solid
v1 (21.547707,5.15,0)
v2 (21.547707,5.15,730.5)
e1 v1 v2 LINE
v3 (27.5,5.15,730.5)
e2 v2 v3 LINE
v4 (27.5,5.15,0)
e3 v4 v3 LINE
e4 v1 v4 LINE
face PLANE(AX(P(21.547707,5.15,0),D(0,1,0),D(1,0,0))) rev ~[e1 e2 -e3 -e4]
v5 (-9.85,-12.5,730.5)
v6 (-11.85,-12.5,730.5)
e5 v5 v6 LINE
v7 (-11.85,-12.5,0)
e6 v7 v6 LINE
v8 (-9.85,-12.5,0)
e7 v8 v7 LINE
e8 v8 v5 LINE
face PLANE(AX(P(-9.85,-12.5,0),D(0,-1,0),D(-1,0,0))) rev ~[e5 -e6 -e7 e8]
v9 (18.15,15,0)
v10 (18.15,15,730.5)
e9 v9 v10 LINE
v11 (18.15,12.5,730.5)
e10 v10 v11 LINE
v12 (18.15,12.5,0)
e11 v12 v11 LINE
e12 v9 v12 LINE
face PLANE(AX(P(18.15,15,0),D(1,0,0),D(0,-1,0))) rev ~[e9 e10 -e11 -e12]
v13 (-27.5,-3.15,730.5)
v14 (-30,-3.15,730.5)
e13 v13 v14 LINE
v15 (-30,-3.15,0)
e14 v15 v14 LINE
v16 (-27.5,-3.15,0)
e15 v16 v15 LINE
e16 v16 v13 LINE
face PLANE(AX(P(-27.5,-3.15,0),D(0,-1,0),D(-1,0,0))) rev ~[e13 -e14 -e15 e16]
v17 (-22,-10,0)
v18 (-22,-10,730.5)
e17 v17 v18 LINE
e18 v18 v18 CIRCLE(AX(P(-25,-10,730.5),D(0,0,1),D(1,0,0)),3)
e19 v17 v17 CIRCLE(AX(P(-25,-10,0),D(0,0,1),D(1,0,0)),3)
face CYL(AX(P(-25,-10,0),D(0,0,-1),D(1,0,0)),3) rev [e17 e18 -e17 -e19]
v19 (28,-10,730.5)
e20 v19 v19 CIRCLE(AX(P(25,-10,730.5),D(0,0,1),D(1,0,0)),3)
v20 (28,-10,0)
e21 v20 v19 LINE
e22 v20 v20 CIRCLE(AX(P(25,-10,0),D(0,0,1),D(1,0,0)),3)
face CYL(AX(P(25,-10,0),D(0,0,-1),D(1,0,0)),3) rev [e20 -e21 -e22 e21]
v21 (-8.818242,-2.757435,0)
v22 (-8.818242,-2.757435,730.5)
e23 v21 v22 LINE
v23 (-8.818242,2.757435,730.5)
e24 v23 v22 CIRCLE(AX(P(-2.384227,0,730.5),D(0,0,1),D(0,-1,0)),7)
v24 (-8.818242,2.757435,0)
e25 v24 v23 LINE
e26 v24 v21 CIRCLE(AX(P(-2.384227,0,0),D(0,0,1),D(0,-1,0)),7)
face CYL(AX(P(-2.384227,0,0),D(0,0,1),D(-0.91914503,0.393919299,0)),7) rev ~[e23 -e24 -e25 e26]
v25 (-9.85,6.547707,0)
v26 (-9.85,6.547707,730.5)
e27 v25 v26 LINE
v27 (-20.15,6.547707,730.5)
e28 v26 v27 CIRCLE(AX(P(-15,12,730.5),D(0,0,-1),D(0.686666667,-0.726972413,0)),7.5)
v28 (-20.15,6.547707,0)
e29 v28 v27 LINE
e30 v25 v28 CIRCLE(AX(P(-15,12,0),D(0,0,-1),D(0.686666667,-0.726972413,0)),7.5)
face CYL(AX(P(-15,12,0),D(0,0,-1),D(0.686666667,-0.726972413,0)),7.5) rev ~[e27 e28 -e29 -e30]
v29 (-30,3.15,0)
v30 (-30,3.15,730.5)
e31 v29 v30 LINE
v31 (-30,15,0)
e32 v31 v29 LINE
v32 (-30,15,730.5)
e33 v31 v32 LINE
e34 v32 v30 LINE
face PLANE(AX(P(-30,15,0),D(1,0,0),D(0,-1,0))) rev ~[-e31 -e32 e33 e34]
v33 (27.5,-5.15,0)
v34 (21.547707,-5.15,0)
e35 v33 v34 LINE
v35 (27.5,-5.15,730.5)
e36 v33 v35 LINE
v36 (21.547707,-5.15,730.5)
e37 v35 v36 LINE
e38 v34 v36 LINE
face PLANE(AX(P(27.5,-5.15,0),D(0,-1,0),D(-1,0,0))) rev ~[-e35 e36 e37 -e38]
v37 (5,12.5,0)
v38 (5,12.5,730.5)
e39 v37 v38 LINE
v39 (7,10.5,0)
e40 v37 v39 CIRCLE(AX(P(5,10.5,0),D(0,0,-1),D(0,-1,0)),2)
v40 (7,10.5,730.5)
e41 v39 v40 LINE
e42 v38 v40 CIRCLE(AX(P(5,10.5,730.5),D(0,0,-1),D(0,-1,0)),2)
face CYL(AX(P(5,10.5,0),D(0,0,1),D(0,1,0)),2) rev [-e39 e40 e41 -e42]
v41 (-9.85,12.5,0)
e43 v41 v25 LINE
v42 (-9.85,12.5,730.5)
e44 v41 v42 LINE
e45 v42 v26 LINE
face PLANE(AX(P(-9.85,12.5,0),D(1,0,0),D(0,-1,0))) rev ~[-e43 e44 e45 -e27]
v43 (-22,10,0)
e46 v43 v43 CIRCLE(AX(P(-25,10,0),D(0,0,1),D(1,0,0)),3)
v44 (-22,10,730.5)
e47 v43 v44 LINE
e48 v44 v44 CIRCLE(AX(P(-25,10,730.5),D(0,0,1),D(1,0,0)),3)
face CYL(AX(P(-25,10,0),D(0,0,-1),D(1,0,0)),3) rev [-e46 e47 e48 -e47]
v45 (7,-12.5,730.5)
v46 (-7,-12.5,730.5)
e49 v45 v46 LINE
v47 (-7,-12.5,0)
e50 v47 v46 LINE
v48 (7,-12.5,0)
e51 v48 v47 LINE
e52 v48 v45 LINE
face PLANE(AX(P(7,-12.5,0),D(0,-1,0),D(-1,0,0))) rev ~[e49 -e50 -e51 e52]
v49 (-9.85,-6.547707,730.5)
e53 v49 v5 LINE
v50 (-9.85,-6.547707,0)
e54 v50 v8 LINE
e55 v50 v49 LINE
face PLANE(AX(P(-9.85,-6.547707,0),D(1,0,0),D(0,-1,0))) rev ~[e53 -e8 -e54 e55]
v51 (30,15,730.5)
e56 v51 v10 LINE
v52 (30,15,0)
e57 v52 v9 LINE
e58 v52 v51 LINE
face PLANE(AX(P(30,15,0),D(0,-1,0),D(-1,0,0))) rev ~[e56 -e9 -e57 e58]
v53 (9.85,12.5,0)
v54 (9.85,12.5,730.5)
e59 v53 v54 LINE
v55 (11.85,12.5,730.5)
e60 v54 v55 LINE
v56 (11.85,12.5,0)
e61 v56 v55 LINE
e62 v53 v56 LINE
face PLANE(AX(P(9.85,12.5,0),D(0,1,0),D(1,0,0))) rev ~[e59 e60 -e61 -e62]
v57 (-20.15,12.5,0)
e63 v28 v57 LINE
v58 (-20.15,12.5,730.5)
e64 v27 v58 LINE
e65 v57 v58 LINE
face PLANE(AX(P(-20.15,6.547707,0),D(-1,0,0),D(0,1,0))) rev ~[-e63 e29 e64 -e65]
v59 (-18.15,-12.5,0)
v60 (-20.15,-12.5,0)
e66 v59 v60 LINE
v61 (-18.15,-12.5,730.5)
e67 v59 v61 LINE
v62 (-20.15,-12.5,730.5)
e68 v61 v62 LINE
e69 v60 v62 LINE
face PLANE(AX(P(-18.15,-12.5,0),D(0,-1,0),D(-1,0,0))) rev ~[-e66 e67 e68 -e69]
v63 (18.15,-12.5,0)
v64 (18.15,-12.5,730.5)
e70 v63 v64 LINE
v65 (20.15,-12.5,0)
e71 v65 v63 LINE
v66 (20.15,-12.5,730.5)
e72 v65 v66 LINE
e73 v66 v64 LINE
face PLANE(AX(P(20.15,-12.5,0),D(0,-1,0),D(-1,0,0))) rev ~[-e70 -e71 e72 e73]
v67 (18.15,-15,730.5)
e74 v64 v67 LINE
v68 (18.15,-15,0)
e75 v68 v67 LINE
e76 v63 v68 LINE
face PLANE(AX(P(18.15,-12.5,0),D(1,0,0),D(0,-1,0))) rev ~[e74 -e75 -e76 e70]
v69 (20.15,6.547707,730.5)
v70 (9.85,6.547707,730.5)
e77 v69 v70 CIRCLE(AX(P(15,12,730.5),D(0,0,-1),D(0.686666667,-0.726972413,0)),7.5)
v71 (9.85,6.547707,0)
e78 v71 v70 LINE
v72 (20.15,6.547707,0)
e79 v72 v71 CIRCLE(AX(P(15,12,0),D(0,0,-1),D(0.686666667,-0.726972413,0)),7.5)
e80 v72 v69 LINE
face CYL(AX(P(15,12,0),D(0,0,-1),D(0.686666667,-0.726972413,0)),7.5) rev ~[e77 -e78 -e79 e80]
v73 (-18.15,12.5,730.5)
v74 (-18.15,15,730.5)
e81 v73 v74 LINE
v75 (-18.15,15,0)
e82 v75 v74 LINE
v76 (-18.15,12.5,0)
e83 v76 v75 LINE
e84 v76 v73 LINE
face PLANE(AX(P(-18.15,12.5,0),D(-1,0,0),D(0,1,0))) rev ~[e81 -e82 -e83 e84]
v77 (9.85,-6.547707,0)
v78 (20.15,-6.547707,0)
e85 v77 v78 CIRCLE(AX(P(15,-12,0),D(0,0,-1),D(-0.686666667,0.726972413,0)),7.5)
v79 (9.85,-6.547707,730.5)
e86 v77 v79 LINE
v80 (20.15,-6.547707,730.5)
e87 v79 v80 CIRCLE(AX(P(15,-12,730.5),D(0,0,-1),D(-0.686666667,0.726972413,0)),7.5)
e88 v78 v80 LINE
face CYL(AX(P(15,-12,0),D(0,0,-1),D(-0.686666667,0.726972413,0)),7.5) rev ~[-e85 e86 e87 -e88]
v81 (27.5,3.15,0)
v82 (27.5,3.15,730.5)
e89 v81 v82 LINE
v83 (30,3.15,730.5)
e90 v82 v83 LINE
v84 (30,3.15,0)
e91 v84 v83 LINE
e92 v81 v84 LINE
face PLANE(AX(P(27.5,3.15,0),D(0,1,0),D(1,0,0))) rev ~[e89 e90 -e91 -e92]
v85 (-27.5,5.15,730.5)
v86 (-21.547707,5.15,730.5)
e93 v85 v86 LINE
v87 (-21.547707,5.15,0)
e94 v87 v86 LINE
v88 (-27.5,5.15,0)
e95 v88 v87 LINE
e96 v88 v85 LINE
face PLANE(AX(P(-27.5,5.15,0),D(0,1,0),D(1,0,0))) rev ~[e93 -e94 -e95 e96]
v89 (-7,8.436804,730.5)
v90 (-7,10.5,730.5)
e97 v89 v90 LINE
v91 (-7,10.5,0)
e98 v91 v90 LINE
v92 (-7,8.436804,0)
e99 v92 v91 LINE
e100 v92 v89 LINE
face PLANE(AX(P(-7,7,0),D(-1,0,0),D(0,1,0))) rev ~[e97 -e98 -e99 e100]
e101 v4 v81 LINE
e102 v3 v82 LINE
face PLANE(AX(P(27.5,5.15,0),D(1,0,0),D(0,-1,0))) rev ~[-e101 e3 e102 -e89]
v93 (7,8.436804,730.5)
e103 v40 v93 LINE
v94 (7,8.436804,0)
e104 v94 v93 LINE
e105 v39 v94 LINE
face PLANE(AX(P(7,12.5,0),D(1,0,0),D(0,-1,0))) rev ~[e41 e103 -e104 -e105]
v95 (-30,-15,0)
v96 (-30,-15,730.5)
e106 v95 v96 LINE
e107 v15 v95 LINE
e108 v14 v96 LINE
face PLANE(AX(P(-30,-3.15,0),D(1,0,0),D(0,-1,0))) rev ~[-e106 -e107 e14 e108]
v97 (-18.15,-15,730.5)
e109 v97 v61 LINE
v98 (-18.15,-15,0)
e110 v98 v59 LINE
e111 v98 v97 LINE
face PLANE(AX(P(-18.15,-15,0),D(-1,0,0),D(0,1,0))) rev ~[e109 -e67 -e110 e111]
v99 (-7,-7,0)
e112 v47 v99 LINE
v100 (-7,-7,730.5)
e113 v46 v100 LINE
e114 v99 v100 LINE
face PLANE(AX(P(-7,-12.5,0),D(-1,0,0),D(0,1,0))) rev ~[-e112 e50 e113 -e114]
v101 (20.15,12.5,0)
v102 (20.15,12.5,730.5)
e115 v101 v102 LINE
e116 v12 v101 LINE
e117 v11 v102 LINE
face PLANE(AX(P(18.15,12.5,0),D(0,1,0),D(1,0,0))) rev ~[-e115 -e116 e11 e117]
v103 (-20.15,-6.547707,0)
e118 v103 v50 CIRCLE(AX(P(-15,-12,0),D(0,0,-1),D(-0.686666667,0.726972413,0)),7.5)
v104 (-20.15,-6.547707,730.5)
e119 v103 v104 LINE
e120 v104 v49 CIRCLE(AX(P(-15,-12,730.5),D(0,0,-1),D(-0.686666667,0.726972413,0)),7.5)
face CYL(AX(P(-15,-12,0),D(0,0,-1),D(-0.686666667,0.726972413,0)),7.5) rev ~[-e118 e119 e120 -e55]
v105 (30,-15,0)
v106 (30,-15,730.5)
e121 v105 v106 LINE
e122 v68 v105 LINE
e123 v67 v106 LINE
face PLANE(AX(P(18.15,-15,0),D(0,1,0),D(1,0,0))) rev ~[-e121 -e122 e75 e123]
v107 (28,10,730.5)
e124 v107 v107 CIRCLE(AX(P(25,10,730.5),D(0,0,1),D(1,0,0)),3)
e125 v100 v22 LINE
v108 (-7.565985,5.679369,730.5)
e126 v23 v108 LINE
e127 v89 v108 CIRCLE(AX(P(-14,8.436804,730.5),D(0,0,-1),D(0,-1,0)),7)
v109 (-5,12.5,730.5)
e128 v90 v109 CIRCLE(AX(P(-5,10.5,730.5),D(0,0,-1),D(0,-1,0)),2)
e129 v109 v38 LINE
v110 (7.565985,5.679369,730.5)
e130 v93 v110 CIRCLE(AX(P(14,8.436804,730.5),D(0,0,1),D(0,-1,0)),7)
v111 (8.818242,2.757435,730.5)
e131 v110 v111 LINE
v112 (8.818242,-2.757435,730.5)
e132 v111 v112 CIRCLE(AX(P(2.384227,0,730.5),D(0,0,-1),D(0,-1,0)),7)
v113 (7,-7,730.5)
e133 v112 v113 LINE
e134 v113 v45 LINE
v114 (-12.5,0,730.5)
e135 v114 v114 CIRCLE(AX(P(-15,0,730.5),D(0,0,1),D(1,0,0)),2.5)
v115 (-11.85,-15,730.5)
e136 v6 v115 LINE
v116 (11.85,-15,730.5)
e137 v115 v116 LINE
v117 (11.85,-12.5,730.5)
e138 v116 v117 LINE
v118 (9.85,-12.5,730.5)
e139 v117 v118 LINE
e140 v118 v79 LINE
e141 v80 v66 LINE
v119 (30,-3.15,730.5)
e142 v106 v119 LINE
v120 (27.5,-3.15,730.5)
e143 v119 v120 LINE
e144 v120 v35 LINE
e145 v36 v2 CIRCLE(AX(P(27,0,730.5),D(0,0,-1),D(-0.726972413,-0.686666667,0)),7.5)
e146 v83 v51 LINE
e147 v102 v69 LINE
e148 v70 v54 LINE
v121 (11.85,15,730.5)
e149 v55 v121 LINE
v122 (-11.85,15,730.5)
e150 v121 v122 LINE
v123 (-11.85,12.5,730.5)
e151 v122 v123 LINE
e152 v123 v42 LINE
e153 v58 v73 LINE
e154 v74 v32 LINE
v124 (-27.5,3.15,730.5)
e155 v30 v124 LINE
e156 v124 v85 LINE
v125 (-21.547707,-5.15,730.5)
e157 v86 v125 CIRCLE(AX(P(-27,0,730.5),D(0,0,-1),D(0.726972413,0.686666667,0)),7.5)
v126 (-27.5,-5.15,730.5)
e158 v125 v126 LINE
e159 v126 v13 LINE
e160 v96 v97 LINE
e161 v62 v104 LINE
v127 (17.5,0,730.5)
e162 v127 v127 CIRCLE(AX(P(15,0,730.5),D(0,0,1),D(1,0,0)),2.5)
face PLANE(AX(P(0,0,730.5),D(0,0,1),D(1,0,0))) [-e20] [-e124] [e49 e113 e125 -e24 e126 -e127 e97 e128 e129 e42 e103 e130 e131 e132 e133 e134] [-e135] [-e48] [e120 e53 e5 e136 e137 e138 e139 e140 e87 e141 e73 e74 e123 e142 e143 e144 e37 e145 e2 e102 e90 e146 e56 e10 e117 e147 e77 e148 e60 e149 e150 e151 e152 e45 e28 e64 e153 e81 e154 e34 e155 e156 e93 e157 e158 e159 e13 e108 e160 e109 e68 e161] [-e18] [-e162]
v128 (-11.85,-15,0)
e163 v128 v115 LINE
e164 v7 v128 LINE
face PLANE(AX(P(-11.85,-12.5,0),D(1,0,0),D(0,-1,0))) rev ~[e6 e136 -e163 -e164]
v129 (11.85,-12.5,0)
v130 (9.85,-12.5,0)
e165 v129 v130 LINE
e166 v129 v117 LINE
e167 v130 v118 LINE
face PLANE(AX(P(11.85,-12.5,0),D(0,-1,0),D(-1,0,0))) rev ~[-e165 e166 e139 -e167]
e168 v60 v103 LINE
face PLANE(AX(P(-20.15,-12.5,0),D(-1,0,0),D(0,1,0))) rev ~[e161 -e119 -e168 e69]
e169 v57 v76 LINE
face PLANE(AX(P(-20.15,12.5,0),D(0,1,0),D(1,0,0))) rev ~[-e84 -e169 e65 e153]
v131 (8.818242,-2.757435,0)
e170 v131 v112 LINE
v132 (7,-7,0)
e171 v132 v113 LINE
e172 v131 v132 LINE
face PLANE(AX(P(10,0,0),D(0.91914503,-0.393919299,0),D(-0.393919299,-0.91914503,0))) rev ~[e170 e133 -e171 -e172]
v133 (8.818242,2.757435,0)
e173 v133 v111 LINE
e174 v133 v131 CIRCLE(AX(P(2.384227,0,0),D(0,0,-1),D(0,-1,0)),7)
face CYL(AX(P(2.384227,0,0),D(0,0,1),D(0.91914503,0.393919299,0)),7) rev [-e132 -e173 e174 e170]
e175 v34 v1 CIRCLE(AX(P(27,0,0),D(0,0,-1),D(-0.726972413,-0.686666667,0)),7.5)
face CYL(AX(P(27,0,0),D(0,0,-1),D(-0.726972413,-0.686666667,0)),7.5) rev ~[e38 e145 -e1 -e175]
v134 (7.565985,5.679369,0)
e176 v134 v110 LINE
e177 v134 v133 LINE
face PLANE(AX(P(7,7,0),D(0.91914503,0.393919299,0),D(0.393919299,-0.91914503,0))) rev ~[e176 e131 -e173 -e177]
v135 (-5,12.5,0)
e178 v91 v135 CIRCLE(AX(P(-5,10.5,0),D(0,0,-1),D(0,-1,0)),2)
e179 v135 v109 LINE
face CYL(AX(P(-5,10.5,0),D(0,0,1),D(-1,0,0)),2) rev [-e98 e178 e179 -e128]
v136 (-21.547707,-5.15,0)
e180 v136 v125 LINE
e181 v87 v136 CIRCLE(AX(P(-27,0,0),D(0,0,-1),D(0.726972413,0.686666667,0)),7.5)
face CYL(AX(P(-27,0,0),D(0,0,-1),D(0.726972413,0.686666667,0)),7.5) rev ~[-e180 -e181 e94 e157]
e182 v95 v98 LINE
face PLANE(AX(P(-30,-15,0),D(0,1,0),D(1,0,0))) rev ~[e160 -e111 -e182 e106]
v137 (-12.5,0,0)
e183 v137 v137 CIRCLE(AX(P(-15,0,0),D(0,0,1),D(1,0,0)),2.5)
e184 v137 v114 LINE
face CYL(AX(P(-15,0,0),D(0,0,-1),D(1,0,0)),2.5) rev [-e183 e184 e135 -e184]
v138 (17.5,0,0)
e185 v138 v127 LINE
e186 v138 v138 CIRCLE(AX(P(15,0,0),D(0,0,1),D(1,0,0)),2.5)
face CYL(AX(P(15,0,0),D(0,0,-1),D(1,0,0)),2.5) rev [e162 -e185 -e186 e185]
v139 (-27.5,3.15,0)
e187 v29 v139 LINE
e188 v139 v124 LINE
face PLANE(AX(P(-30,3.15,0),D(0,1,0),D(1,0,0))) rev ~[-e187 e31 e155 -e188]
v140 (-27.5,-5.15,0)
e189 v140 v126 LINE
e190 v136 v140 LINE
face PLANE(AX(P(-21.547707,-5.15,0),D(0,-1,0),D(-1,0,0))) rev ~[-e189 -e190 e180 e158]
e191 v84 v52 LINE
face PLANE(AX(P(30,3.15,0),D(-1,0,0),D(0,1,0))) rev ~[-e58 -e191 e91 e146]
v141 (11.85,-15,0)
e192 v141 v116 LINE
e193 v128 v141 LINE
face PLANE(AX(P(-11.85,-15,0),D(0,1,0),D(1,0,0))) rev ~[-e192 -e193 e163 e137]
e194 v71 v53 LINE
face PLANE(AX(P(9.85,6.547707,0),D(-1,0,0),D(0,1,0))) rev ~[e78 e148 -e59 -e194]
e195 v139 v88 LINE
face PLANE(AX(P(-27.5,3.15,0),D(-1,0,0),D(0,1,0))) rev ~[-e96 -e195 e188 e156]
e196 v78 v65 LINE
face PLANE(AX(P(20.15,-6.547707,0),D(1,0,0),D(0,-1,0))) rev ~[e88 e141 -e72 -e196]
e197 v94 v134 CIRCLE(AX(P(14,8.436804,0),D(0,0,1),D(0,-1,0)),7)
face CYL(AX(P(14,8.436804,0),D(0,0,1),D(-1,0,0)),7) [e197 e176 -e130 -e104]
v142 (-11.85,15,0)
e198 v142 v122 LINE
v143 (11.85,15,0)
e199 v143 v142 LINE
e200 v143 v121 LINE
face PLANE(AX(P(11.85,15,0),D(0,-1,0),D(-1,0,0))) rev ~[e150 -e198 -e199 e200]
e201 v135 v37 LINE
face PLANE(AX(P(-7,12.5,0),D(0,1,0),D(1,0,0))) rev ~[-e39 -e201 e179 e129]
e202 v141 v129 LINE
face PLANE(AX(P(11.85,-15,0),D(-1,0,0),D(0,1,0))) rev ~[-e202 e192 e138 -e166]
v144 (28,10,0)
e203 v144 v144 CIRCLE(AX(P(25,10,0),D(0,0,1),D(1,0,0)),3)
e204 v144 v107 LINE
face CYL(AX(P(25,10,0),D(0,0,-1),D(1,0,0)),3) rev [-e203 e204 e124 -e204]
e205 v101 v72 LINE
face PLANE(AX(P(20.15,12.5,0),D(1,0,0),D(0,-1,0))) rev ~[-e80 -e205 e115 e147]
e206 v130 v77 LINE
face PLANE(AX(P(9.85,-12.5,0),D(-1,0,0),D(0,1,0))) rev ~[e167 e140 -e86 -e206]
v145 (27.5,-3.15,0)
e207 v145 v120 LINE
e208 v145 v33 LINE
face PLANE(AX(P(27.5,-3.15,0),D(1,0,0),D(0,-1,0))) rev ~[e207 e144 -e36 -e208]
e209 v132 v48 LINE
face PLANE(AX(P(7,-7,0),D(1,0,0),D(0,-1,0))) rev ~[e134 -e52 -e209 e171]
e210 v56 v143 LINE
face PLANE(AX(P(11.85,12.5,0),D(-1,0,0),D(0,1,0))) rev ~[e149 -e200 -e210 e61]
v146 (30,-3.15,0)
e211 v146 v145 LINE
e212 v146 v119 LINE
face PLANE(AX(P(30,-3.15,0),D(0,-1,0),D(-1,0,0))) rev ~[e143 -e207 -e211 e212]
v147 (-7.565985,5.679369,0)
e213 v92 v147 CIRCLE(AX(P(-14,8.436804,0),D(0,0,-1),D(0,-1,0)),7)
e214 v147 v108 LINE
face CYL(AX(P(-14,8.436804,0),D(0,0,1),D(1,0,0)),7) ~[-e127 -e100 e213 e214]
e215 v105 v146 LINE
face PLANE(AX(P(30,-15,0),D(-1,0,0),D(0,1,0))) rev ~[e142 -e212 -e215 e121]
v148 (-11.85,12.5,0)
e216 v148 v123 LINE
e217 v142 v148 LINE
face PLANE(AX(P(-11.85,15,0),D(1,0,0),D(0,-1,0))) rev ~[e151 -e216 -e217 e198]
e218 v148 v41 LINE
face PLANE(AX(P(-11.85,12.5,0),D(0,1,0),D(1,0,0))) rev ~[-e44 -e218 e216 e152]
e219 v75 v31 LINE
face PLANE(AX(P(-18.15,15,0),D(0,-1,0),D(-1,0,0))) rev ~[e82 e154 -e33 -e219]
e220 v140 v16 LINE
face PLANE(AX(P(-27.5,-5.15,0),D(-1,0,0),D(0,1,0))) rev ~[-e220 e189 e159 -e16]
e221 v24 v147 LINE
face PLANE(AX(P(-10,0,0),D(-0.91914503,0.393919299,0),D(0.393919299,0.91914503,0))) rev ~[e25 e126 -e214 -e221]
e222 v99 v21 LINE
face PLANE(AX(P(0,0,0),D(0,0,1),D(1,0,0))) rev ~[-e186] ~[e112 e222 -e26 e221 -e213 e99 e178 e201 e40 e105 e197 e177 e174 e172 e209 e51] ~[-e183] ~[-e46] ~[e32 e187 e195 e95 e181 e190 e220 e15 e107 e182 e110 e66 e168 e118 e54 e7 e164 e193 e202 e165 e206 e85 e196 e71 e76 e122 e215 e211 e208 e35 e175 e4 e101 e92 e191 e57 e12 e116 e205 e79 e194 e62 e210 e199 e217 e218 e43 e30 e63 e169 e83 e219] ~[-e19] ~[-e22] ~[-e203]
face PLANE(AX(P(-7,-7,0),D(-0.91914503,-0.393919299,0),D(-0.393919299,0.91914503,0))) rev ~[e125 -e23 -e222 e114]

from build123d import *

# Parameters (mm, degrees)
F0_R     = 3
F0_R_2   = 2.5
F1_DEPTH = 730.5
F2_R     = 2
F3_R     = 7


# Not quite as in the source:
# - a feature names something its author has since deleted; it is built from what else it names


with BuildPart() as f1:
    # F0 (on Top) → F1 (new body)
    with BuildSketch(Plane.XY):
        with BuildLine():
            Line((18.15, -15), (30, -15))
            Line((30, -15), (30, -3.15))
            Line((30, -3.15), (27.5, -3.15))
            Line((27.5, -3.15), (27.5, -5.15))
            Line((27.5, -5.15), (21.5477069044, -5.15))
            ThreePointArc((21.5477069044, -5.15), (19.5, 0), (21.5477069044, 5.15))
            Line((21.5477069044, 5.15), (27.5, 5.15))
            Line((27.5, 5.15), (27.5, 3.15))
            Line((27.5, 3.15), (30, 3.15))
            Line((30, 3.15), (30, 15))
            Line((30, 15), (18.15, 15))
            Line((18.15, 15), (18.15, 12.5))
            Line((18.15, 12.5), (20.15, 12.5))
            Line((20.15, 12.5), (20.15, 6.5477069044))
            ThreePointArc((20.15, 6.5477069044), (15, 4.5), (9.85, 6.5477069044))
            Line((9.85, 6.5477069044), (9.85, 12.5))
            Line((9.85, 12.5), (11.85, 12.5))
            Line((11.85, 12.5), (11.85, 15))
            Line((11.85, 15), (-11.85, 15))
            Line((-11.85, 15), (-11.85, 12.5))
            Line((-11.85, 12.5), (-9.85, 12.5))
            Line((-9.85, 12.5), (-9.85, 6.5477069044))
            ThreePointArc((-9.85, 6.5477069044), (-15, 4.5), (-20.15, 6.5477069044))
            Line((-20.15, 6.5477069044), (-20.15, 12.5))
            Line((-20.15, 12.5), (-18.15, 12.5))
            Line((-18.15, 12.5), (-18.15, 15))
            Line((-18.15, 15), (-30, 15))
            Line((-30, 15), (-30, 3.15))
            Line((-30, 3.15), (-27.5, 3.15))
            Line((-27.5, 3.15), (-27.5, 5.15))
            Line((-27.5, 5.15), (-21.5477069044, 5.15))
            ThreePointArc((-21.5477069044, 5.15), (-19.5, 0), (-21.5477069044, -5.15))
            Line((-21.5477069044, -5.15), (-27.5, -5.15))
            Line((-27.5, -5.15), (-27.5, -3.15))
            Line((-27.5, -3.15), (-30, -3.15))
            Line((-30, -3.15), (-30, -15))
            Line((-30, -15), (-18.15, -15))
            Line((-18.15, -15), (-18.15, -12.5))
            Line((-18.15, -12.5), (-20.15, -12.5))
            Line((-20.15, -12.5), (-20.15, -6.5477069044))
            ThreePointArc((-20.15, -6.5477069044), (-15, -4.5), (-9.85, -6.5477069044))
            Line((-9.85, -6.5477069044), (-9.85, -12.5))
            Line((-9.85, -12.5), (-11.85, -12.5))
            Line((-11.85, -12.5), (-11.85, -15))
            Line((-11.85, -15), (11.85, -15))
            Line((11.85, -15), (11.85, -12.5))
            Line((11.85, -12.5), (9.85, -12.5))
            Line((9.85, -12.5), (9.85, -6.5477069044))
            ThreePointArc((9.85, -6.5477069044), (15, -4.5), (20.15, -6.5477069044))
            Line((20.15, -6.5477069044), (20.15, -12.5))
            Line((20.15, -12.5), (18.15, -12.5))
            Line((18.15, -12.5), (18.15, -15))
        make_face()
        with Locations((-25, -10)):
            Circle(F0_R, mode=Mode.SUBTRACT)
        with Locations((25, -10)):
            Circle(F0_R, mode=Mode.SUBTRACT)
        with Locations((-15, 0)):
            Circle(F0_R_2, mode=Mode.SUBTRACT)
        with Locations((-25, 10)):
            Circle(F0_R, mode=Mode.SUBTRACT)
        Polygon((-7, 7), (-7, 12.5), (0, 12.5), (7, 12.5), (7, 7), (10, 0), (7, -7), (7, -12.5), (0, -12.5), (-7, -12.5), (-7, -7), (-10, 0), align=None, mode=Mode.SUBTRACT)
        with Locations((15, 0)):
            Circle(F0_R_2, mode=Mode.SUBTRACT)
        with Locations((25, 10)):
            Circle(F0_R, mode=Mode.SUBTRACT)
    extrude(amount=F1_DEPTH)

    # F2
    f2_edges = [f1.edges().sort_by_distance(p)[0] for p in [
        (-7, 12.5, 365.25),
        (7, 12.5, 365.25),
    ]]
    fillet(f2_edges, radius=F2_R)

    # F3
    f3_edges = [f1.edges().sort_by_distance(p)[0] for p in [
        (-7, 7, 365.25),
        (-10, 0, 365.25),
        (7, 7, 365.25),
        (10, 0, 365.25),
    ]]
    fillet(f3_edges, radius=F3_R)


solid = f1.part
